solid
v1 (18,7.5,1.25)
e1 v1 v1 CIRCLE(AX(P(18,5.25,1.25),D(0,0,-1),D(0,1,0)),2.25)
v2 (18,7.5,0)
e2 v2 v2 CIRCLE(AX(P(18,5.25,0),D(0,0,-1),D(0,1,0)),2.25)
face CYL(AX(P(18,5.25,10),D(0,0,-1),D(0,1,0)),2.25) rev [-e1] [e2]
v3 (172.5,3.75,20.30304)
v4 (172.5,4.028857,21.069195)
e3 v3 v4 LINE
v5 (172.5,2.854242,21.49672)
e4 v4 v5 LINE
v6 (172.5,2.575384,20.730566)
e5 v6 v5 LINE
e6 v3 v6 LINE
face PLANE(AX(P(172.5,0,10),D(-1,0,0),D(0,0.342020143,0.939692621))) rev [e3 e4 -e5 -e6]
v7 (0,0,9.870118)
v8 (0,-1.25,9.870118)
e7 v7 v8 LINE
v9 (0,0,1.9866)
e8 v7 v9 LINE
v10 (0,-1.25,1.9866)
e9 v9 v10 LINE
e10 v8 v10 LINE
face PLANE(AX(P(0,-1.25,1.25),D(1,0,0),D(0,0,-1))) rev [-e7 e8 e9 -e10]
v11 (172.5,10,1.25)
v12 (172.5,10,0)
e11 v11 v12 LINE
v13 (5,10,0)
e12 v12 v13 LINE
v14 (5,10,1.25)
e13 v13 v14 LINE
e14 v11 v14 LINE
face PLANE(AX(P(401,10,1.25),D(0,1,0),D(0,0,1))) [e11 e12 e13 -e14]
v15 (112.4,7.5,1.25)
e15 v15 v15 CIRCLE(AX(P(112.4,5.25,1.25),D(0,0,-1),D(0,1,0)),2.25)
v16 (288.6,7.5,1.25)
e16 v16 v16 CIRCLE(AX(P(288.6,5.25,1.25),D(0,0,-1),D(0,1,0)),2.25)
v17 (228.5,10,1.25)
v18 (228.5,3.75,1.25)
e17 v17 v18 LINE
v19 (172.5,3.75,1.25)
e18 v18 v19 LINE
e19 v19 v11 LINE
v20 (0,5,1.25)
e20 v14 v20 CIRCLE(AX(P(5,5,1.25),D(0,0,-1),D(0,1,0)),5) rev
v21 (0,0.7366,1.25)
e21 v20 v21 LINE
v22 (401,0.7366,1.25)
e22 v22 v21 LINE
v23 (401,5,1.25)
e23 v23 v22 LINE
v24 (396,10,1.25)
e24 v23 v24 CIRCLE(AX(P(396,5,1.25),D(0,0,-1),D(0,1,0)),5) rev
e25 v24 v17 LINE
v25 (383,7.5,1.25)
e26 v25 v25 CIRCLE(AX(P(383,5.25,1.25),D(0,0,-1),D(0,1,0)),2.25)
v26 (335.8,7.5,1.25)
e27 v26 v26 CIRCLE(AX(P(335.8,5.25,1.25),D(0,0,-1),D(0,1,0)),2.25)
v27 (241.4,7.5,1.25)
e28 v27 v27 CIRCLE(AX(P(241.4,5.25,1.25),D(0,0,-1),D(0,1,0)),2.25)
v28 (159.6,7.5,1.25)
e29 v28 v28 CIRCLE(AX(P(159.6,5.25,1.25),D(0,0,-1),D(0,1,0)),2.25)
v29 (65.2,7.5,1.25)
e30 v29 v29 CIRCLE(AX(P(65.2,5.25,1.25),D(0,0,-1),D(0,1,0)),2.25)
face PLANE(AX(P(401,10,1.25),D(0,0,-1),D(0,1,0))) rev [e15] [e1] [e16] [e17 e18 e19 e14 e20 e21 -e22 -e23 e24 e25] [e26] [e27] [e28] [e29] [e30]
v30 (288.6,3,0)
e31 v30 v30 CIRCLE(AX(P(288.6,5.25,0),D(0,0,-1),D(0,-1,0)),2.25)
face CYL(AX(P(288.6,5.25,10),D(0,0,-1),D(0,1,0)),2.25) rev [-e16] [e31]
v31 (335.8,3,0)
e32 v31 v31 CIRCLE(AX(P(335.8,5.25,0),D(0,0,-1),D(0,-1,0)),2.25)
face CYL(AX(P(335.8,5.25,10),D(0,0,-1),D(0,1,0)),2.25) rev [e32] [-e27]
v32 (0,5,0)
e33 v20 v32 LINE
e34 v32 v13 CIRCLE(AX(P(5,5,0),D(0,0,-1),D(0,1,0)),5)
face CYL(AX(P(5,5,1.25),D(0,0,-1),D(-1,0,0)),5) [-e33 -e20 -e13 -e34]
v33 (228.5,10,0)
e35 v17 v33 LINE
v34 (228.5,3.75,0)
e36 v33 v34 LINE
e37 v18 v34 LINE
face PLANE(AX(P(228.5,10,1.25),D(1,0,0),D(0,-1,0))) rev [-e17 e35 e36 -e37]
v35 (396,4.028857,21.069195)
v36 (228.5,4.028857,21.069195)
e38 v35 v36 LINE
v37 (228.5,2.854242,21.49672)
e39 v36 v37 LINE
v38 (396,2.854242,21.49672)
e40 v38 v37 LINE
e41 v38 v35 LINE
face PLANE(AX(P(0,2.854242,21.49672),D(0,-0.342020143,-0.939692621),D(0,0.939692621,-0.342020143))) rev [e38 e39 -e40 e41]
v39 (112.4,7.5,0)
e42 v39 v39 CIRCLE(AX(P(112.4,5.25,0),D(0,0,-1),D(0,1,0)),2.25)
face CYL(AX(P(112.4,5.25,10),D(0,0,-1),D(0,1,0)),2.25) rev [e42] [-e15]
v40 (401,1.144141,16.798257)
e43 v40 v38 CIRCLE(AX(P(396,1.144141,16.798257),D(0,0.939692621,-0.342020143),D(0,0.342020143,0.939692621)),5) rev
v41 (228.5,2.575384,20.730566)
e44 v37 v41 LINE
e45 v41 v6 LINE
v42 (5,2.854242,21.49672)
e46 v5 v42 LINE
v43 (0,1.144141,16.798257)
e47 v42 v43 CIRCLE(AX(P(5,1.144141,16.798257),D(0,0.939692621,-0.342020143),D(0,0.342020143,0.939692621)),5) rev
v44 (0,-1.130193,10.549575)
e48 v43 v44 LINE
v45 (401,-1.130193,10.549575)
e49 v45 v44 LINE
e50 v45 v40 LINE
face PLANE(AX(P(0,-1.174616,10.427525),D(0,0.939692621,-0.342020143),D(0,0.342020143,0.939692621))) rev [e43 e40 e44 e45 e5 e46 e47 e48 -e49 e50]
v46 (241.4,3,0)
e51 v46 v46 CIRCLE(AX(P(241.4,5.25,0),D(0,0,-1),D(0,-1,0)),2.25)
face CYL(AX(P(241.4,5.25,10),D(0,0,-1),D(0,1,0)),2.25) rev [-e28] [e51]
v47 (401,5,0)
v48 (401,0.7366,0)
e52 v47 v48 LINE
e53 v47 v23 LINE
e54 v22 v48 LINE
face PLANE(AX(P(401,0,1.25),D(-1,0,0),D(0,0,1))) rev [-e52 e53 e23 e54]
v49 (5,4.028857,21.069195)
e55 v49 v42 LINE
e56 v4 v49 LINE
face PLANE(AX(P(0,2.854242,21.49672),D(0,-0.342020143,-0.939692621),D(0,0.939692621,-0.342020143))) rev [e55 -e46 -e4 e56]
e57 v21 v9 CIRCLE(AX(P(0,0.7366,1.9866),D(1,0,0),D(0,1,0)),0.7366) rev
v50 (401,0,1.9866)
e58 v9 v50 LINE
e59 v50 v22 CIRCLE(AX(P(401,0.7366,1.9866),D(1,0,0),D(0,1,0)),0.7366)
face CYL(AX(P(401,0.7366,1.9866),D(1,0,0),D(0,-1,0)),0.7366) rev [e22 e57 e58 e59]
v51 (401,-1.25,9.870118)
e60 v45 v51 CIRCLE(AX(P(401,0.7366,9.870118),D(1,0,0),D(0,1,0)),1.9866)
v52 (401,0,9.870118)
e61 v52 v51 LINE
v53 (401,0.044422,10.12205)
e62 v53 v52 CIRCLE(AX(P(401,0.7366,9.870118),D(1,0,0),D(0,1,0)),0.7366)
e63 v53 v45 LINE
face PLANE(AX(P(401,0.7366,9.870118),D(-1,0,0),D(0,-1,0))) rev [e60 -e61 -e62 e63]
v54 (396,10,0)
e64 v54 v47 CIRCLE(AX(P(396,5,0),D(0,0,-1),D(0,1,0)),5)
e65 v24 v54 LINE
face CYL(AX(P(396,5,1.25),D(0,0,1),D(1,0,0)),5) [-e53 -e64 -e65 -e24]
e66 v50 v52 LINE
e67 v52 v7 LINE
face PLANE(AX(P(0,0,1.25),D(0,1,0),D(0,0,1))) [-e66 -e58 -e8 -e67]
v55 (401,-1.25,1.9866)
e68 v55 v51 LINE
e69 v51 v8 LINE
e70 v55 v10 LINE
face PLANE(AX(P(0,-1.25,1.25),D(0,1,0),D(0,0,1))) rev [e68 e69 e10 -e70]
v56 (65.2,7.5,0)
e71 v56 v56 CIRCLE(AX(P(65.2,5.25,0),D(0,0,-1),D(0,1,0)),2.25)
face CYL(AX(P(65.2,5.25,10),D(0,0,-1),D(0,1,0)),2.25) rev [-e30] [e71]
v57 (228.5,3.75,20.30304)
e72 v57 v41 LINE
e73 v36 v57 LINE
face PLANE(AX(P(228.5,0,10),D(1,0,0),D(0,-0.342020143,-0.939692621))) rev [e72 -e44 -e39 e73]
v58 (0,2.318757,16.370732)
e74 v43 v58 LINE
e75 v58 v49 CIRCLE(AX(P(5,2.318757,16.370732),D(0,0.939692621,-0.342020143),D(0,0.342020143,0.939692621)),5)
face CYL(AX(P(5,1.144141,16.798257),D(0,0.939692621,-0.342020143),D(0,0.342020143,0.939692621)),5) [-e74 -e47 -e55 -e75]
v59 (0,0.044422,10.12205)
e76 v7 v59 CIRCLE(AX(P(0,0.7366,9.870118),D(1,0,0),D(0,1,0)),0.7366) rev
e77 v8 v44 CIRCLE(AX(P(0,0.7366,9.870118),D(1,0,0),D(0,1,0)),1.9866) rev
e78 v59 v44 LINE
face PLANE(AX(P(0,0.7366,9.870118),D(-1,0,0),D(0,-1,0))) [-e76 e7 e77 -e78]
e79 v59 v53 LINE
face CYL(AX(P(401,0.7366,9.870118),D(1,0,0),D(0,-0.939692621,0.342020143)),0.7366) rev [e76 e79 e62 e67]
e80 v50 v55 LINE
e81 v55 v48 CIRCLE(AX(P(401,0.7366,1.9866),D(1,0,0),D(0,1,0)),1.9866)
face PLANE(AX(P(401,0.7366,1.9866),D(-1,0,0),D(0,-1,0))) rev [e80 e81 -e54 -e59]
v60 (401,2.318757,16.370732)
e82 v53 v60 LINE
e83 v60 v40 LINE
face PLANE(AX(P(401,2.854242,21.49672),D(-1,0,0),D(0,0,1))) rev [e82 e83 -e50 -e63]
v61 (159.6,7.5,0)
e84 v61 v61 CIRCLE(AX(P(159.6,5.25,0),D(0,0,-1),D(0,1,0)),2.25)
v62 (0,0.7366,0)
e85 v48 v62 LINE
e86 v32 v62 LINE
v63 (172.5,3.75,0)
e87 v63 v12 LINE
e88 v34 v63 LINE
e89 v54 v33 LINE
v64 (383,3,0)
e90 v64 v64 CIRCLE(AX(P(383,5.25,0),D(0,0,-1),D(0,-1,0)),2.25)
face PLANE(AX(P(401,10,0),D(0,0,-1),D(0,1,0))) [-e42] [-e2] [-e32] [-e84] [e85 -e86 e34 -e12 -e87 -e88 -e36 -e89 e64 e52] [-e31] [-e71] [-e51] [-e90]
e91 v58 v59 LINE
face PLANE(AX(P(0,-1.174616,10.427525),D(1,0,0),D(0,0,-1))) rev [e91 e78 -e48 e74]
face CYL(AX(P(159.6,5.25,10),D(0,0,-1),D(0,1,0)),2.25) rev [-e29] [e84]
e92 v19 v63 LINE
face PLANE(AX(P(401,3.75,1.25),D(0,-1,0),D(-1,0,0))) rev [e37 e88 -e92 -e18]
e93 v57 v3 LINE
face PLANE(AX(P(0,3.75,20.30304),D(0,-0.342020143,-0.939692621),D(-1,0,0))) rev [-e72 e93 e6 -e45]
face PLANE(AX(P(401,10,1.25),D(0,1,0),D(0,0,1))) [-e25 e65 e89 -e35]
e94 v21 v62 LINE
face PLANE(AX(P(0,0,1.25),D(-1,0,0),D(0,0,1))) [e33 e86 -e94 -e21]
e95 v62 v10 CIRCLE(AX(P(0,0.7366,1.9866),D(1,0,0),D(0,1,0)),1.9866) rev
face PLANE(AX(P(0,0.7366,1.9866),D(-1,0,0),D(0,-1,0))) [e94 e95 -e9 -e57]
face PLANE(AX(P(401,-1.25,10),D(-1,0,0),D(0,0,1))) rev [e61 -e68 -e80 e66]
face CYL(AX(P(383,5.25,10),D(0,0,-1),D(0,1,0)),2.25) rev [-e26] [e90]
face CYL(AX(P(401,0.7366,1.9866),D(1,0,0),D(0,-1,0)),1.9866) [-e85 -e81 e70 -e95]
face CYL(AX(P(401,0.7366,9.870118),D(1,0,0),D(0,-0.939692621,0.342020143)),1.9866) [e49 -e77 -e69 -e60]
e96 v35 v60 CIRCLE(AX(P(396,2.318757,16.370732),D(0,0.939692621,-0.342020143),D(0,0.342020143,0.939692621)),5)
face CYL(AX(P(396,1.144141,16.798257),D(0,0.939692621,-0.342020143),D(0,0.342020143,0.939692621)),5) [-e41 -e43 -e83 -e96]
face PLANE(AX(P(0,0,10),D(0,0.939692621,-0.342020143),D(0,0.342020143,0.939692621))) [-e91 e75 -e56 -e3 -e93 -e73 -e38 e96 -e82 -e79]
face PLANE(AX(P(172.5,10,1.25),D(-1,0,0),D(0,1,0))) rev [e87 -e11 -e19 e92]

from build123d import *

# Parameters (mm, degrees)
SKETCH1_W                    = 1.25
SKETCH1_H                    = 10
BASE_FLANGE1_DEPTH           = 401
EDGE_FLANGE1_STRIP_W         = 6.4732
EDGE_FLANGE1_STRIP_H         = 1.25
EDGE_FLANGE1_STRIP_CUT_DEPTH = 401
EDGE_FLANGE1_DEPTH           = 401
EDGE_FLANGE2_STRIP_CUT_DEPTH = 401
EDGE_FLANGE2_DEPTH           = 401
CUT_EXTRUDE1_START           = 172.5
CUT_EXTRUDE1_OUTLINE_W       = 6.25
CUT_EXTRUDE1_OUTLINE_H       = 1.25
CUT_EXTRUDE1_DEPTH           = 56
SKETCH10_R                   = 2.25
CUT_EXTRUDE2_DEPTH           = 10
FILLET1_R                    = 5


# Read off the part's stored shape, not the designer's step: Cut-Extrude1
# Sheet-metal steps are written as plain solids
with BuildPart() as part:
    # Sketch1 → Base-Flange1 (new body)
    with BuildSketch(Plane(origin=(0, 0, 0), x_dir=(0, 0, -1), z_dir=(1, 0, 0))):
        with Locations((-0.625, 5)):
            Rectangle(SKETCH1_W, SKETCH1_H)
    extrude(amount=BASE_FLANGE1_DEPTH)

    # Edge-Flange1 strip (across the edge) → Edge-Flange1 strip cut (cut)
    with BuildSketch(Plane(origin=(0, 0, 1.25), x_dir=(0, 1, 0), z_dir=(1, 0, 0))):
        with Locations((-2.5, -0.625)):
            Rectangle(EDGE_FLANGE1_STRIP_W, EDGE_FLANGE1_STRIP_H)
    extrude(amount=EDGE_FLANGE1_STRIP_CUT_DEPTH, mode=Mode.SUBTRACT)

    # Edge-Flange1 section (across the edge) → Edge-Flange1 (add)
    with BuildSketch(Plane(origin=(0, 0, 1.25), x_dir=(0, 1, 0), z_dir=(1, 0, 0))):
        with BuildLine():
            Line((-1.25, 0.7366), (-1.25, 8.75))
            Line((-1.25, 8.75), (0, 8.75))
            Line((0, 8.75), (0, 0.7366))
            ThreePointArc((0, 0.7366), (0.215745145, 0.215745145), (0.7366, 0))
            Line((0.7366, 0), (0.7366, -1.25))
            ThreePointArc((0.7366, -1.25), (-0.668138332, -0.668138332), (-1.25, 0.7366))
        make_face()
    extrude(amount=EDGE_FLANGE1_DEPTH)

    # Edge-Flange2 strip (across the edge) → Edge-Flange2 strip cut (cut)
    with BuildSketch(Plane(origin=(0, 0, 10), x_dir=(0, 0.9396926207859113, -0.3420201433256607), z_dir=(1, 0, 0))):
        Polygon((-3.344158152, 5.53324351), (-1.13019336, -0.549574763), (0.044422416, -0.122049584), (-2.169542376, 5.960768689), align=None)
    extrude(amount=EDGE_FLANGE2_STRIP_CUT_DEPTH, mode=Mode.SUBTRACT)

    # Edge-Flange2 section (across the edge) → Edge-Flange2 (add)
    with BuildSketch(Plane(origin=(0, 0, 10), x_dir=(0, 0.9396926207859113, -0.3420201433256607), z_dir=(1, 0, 0))):
        with BuildLine():
            Line((-1.25, 0.129882454), (-1.25, 11.779591274))
            Line((-1.25, 11.779591274), (0, 11.779591274))
            Line((0, 11.779591274), (0, 0.129882454))
            ThreePointArc((0, 0.129882454), (0.011190609, 0.001973206), (0.044422416, -0.122049584))
            Line((0.044422416, -0.122049584), (-1.13019336, -0.549574763))
            ThreePointArc((-1.13019336, -0.549574763), (-1.219819082, -0.215087016), (-1.25, 0.129882454))
        make_face()
    extrude(amount=EDGE_FLANGE2_DEPTH)

    # Cut-Extrude1 outline → Cut-Extrude1 (cut)
    with BuildSketch(Plane.YZ.offset(CUT_EXTRUDE1_START)):
        Polygon((2.85424172, 21.496720175), (2.575384224, 20.730565502), (3.75, 20.303040323), (4.028857496, 21.069194996), align=None)
        with Locations((6.875, 0.625)):
            Rectangle(CUT_EXTRUDE1_OUTLINE_W, CUT_EXTRUDE1_OUTLINE_H)
    extrude(amount=CUT_EXTRUDE1_DEPTH, mode=Mode.SUBTRACT)

    # Sketch10 → Cut-Extrude2 (cut)
    with BuildSketch(Plane(origin=(0, 0, 0), x_dir=(-1, 0, 0), z_dir=(0, 0, -1))):
        with Locations(Location((-18, 5.25, 0), (0, 0, 90))):
            Circle(SKETCH10_R)
        with Locations(Location((-65.2, 5.25, 0), (0, 0, 90))):
            Circle(SKETCH10_R)
        with Locations(Location((-112.4, 5.25, 0), (0, 0, 90))):
            Circle(SKETCH10_R)
        with Locations(Location((-159.6, 5.25, 0), (0, 0, 90))):
            Circle(SKETCH10_R)
        with Locations(Location((-241.4, 5.25, 0), (0, 0, 90))):
            Circle(SKETCH10_R)
        with Locations(Location((-288.6, 5.25, 0), (0, 0, 90))):
            Circle(SKETCH10_R)
        with Locations(Location((-335.8, 5.25, 0), (0, 0, 90))):
            Circle(SKETCH10_R)
        with Locations(Location((-383, 5.25, 0), (0, 0, 90))):
            Circle(SKETCH10_R)
    extrude(amount=-CUT_EXTRUDE2_DEPTH, mode=Mode.SUBTRACT)

    # Fillet1
    fillet1_edges = [part.edges().sort_by_distance(p)[0] for p in [
        (401, 10, 0.625),
        (0, 10, 0.625),
        (0, 3.441549608, 21.282957586),
        (401, 3.441549608, 21.282957586),
    ]]
    fillet(fillet1_edges, radius=FILLET1_R)


solid = part.part
